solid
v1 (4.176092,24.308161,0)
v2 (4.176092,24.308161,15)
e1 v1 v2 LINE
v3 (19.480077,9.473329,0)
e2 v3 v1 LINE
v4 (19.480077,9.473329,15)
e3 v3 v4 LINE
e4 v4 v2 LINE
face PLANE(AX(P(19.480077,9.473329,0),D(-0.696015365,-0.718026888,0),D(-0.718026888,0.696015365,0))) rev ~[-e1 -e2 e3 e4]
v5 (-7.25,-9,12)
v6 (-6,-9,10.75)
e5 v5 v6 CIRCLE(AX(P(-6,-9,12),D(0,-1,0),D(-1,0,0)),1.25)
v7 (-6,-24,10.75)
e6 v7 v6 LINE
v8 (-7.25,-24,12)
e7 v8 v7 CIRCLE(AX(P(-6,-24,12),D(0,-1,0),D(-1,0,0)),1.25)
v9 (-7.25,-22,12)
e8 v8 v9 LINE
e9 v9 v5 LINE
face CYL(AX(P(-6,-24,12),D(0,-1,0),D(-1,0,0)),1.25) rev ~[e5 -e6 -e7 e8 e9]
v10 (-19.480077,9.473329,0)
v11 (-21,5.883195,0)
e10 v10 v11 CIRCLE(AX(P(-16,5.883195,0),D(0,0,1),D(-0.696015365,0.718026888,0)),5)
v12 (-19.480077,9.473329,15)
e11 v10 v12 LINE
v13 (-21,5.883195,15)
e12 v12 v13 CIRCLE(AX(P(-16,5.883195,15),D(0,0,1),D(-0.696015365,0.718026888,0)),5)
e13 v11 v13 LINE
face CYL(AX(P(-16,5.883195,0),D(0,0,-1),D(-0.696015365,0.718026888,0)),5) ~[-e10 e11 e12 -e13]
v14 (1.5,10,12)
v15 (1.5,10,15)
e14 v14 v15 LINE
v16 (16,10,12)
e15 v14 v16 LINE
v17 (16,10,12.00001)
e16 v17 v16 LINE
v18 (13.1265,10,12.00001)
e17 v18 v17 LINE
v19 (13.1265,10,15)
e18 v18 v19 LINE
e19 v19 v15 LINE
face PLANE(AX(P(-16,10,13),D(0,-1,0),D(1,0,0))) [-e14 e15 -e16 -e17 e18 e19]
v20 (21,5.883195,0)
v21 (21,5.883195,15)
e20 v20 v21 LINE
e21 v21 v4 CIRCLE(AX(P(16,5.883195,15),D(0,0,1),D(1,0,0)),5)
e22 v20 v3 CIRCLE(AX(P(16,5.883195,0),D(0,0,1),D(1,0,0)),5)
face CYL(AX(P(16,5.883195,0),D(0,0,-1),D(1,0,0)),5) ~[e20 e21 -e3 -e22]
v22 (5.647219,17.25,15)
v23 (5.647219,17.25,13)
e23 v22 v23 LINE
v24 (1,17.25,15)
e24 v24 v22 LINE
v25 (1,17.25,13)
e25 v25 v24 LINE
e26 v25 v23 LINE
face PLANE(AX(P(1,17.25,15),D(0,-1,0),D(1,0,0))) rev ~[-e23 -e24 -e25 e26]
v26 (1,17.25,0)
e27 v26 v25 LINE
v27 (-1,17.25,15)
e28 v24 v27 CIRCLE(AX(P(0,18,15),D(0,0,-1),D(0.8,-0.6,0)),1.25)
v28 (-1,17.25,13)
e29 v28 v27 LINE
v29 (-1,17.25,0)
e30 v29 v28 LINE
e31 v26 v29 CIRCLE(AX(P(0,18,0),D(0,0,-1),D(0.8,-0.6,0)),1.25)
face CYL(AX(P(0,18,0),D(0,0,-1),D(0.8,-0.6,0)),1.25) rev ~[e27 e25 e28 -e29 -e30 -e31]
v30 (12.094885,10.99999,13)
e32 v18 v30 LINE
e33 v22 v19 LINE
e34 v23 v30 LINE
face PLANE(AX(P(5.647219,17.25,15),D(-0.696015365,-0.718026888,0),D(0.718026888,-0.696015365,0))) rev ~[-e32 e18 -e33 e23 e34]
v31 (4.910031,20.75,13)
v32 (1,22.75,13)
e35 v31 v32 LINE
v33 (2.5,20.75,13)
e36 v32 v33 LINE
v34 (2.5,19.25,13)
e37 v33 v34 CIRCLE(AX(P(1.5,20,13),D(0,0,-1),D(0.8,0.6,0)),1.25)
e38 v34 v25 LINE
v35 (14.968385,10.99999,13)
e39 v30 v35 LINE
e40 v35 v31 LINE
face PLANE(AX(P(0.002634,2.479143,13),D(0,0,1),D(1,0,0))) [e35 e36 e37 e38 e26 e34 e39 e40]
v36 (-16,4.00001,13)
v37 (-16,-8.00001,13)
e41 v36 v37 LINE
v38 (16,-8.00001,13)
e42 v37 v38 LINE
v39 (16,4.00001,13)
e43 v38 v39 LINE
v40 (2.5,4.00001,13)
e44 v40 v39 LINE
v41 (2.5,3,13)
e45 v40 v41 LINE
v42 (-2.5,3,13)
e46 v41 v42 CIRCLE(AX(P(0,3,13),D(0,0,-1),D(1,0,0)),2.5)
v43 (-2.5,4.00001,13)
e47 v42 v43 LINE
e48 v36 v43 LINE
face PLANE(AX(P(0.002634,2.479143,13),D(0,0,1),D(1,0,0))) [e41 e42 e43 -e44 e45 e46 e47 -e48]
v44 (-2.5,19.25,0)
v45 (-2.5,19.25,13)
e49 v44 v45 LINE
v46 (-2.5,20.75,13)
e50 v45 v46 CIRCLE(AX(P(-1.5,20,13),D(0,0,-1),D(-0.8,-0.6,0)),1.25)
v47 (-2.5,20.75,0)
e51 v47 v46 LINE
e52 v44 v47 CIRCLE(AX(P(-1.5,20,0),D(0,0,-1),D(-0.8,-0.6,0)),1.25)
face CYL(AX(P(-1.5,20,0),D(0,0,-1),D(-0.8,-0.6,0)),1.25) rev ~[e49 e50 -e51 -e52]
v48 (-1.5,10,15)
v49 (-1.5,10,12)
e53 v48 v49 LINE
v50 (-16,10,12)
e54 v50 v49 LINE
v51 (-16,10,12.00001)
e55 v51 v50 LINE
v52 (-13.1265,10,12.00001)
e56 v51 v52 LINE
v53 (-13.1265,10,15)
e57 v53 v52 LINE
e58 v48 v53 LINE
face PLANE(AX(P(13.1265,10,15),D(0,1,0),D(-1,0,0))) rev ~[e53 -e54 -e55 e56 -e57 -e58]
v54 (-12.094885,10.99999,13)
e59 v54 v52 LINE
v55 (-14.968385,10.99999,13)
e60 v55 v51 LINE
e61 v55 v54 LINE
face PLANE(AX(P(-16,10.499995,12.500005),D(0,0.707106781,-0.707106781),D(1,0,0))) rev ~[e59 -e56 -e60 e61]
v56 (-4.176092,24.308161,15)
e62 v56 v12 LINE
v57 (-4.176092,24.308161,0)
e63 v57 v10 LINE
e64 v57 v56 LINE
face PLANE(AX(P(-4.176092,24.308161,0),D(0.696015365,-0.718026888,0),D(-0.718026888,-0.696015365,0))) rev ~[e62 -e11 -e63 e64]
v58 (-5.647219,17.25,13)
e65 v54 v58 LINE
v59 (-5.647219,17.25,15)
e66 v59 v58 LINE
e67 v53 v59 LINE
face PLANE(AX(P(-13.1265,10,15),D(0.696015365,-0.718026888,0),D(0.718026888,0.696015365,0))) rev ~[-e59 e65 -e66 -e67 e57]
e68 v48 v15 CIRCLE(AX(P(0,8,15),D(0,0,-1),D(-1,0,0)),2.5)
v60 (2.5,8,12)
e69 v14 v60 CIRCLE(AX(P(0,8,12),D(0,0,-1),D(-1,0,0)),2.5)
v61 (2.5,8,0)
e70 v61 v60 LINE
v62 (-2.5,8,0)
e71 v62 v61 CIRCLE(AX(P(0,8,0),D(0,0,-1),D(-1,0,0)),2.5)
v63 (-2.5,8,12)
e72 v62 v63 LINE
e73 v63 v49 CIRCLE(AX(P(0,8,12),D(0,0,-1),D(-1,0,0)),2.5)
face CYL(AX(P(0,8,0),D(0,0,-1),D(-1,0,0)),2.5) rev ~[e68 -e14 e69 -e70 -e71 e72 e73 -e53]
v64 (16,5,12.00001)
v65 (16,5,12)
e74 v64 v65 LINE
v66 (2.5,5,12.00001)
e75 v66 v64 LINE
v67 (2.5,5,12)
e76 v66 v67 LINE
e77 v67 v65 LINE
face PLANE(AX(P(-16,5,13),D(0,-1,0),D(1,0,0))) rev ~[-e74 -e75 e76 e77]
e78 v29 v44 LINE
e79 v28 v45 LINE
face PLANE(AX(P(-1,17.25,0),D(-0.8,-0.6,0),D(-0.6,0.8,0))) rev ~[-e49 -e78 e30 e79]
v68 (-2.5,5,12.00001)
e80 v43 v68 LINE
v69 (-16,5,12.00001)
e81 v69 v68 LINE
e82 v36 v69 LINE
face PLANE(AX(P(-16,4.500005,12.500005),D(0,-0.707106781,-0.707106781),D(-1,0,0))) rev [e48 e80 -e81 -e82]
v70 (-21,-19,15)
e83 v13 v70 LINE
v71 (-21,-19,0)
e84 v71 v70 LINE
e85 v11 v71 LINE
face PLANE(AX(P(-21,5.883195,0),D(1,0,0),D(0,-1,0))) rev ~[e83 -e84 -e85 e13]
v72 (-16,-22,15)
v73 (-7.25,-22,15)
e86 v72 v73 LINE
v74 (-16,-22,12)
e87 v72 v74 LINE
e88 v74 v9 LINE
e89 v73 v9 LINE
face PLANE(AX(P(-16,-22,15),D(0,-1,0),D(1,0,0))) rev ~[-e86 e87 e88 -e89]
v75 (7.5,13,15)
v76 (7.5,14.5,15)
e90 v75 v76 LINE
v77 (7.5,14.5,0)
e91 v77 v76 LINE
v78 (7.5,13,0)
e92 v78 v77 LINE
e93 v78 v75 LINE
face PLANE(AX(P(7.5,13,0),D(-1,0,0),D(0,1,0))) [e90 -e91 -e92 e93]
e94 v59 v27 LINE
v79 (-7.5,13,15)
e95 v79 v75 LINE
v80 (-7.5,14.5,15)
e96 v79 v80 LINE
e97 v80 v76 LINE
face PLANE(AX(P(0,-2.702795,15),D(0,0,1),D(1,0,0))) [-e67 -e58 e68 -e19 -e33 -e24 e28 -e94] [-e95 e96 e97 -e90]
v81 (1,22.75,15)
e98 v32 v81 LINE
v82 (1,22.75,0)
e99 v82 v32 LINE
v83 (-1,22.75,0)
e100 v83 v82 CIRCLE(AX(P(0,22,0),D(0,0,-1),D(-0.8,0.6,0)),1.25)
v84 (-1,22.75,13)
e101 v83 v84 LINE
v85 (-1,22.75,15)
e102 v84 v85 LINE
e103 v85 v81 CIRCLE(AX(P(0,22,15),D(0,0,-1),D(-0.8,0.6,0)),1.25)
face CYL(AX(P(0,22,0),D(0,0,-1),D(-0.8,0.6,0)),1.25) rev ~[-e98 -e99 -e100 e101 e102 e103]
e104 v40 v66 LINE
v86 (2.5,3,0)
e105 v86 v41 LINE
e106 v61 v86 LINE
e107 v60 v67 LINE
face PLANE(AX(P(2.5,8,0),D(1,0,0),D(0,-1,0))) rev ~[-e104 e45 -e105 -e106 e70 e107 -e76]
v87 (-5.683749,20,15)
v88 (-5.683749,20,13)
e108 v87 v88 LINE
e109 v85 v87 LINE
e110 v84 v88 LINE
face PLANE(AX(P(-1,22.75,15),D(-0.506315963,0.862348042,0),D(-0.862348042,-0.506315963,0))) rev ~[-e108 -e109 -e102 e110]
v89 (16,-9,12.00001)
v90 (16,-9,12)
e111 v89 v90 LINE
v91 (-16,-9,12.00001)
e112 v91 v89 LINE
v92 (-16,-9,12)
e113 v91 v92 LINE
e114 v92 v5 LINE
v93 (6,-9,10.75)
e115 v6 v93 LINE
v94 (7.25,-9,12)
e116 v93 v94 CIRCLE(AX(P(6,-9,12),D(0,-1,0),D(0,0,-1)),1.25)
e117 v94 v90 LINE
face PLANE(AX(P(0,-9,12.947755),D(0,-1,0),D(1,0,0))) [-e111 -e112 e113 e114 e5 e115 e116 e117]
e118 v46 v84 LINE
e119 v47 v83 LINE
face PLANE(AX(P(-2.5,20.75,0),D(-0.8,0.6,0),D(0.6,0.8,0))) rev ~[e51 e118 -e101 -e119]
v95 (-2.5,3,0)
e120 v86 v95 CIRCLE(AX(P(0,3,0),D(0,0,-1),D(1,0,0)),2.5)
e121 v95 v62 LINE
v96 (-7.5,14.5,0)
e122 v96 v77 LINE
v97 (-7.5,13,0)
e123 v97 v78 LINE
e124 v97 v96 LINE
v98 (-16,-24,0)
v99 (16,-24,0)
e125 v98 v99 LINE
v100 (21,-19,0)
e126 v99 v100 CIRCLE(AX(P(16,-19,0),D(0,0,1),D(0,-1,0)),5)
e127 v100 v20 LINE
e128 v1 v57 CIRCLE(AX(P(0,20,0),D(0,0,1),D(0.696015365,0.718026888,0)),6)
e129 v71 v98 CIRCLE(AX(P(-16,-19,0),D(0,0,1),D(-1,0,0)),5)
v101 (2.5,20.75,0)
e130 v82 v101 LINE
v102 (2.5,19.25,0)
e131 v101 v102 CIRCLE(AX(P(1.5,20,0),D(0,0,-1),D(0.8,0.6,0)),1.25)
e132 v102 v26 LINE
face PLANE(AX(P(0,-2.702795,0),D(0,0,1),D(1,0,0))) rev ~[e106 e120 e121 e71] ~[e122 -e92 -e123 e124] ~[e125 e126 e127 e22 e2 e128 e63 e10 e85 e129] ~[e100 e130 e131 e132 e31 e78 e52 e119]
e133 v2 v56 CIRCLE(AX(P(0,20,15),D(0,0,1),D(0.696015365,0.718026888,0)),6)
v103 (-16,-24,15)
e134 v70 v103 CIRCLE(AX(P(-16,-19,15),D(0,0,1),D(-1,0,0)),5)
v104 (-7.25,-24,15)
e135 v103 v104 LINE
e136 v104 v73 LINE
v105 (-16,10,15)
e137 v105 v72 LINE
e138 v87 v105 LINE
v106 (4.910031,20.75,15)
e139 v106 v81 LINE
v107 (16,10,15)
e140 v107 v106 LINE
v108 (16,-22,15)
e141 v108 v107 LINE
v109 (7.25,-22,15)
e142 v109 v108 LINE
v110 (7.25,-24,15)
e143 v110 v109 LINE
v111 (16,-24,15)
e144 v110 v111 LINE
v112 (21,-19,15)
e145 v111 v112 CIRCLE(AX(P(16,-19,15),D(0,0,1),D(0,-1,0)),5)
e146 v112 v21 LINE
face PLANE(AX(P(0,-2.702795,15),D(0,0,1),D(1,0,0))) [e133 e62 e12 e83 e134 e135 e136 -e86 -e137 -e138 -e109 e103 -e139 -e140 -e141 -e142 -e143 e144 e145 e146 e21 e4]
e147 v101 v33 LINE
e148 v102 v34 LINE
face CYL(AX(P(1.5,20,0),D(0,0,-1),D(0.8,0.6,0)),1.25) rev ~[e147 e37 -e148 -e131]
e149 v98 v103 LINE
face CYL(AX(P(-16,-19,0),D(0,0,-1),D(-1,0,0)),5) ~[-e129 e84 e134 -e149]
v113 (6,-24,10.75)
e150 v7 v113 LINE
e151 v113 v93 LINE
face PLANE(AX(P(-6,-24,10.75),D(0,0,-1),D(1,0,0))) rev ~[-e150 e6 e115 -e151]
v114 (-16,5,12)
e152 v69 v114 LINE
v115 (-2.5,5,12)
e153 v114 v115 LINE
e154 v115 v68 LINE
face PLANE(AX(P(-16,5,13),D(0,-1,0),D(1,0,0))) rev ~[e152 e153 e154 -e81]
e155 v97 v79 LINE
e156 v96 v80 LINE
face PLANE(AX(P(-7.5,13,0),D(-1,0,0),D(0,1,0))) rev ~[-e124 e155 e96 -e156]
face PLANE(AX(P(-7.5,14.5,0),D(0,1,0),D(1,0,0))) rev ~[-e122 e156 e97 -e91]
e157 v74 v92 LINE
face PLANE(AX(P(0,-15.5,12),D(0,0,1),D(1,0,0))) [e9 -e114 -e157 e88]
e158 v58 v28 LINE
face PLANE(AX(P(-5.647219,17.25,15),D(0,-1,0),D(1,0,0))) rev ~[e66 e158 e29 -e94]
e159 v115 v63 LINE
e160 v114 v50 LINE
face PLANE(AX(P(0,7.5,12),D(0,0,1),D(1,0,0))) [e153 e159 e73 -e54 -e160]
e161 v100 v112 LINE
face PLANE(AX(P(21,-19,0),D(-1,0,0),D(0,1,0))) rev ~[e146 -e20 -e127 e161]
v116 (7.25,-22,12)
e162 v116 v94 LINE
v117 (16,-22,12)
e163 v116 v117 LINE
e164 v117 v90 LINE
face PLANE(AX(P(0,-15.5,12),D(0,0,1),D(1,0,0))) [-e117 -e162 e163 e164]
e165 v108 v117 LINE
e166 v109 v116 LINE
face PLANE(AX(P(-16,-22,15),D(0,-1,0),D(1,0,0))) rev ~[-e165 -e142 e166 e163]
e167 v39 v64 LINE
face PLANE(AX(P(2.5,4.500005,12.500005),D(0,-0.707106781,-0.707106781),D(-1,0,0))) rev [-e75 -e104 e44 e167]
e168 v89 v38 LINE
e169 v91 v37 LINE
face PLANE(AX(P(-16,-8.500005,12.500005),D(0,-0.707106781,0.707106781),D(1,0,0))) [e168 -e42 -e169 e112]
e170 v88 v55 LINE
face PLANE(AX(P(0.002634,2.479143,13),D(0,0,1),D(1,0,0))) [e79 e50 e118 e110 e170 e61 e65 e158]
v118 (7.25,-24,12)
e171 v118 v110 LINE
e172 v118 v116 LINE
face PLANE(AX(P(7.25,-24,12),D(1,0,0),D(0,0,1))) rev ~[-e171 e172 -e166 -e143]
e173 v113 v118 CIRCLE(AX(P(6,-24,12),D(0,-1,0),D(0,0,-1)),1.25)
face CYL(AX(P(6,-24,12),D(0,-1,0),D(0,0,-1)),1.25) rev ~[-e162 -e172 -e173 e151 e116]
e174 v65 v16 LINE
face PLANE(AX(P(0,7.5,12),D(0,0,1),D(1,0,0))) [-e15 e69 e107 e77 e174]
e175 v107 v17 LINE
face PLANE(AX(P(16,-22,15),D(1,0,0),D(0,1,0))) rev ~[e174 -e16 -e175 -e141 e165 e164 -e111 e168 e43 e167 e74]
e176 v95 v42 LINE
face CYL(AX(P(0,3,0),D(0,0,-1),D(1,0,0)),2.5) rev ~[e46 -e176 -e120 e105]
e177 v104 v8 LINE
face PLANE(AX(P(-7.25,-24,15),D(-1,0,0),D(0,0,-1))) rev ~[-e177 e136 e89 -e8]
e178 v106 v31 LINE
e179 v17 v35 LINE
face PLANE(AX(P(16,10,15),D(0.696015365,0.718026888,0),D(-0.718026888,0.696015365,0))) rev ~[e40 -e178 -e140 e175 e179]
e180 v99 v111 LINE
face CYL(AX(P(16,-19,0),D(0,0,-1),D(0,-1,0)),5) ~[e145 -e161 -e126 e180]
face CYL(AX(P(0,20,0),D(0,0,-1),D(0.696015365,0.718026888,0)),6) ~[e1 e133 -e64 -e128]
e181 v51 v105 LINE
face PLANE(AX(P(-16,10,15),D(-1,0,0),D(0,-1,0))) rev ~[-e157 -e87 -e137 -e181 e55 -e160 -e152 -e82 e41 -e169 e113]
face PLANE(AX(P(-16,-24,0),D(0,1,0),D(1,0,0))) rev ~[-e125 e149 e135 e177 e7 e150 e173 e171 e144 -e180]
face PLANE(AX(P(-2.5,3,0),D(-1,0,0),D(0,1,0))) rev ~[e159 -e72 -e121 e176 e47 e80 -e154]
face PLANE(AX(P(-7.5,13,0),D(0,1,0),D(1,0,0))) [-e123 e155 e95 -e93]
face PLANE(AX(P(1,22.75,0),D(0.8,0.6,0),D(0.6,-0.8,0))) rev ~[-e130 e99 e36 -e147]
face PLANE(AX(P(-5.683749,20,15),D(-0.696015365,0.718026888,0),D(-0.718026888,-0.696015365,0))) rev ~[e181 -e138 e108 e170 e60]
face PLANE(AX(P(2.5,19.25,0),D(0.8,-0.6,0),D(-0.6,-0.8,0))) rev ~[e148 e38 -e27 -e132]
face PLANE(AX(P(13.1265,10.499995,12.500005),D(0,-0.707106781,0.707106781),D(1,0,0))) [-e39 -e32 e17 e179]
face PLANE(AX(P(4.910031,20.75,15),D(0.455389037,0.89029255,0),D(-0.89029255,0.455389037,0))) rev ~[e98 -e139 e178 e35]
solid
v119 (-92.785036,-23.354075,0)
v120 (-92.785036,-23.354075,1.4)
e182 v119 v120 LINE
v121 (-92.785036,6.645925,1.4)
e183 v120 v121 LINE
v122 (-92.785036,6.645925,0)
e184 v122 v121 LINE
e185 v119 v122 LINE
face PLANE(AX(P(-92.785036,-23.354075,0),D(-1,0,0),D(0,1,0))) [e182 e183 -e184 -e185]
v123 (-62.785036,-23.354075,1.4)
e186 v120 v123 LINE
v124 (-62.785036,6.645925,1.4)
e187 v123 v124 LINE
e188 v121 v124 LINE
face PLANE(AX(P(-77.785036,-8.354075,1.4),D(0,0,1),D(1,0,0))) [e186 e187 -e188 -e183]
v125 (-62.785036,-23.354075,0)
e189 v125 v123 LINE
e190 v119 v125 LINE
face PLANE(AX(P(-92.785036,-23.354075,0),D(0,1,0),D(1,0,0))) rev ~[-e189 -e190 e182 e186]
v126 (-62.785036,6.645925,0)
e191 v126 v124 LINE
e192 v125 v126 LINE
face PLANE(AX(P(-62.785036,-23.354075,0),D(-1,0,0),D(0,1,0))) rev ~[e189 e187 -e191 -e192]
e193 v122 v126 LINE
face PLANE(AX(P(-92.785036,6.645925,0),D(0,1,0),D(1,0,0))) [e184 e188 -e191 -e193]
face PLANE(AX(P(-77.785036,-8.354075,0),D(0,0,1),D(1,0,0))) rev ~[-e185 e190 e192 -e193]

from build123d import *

# Parameters (mm, degrees)
F0_W     = 30
F0_H     = 30
F1_DEPTH = 1.4
F2_W     = 15
F2_H     = 1.5
F3_DEPTH = 15
F5_DEPTH = 2
F7_DEPTH = 15
F8_W     = 32
F8_H     = 5
F8_H_2   = 13
F9_DEPTH = 1
F10_SIZE = 0.99999


# Not quite as in the source:
# - a fillet or chamfer is up to 0.001 mm smaller than in the source, because OpenCascade refuses the exact size


with BuildPart() as f1:
    # F0 (on Top) → F1 (new body)
    with BuildSketch(Plane.XY):
        with Locations((-77.7850355953, -8.3540751795)):
            Rectangle(F0_W, F0_H)
    extrude(amount=F1_DEPTH)


with BuildPart() as f3:
    # F2 (on Top) → F3 (new body)
    with BuildSketch(Plane.XY):
        with BuildLine():
            Line((19.4800768234, 9.4733290654), (4.176092188, 24.308161329))
            ThreePointArc((4.176092188, 24.308161329), (0, 26), (-4.176092188, 24.308161329))
            Line((-4.176092188, 24.308161329), (-19.4800768234, 9.4733290654))
            ThreePointArc((-19.4800768234, 9.4733290654), (-20.6043666294, 7.8325042309), (-21, 5.8831946245))
            Line((-21, 5.8831946245), (-21, -19))
            ThreePointArc((-21, -19), (-19.5355339059, -22.5355339059), (-16, -24))
            Line((-16, -24), (16, -24))
            ThreePointArc((16, -24), (19.5355339059, -22.5355339059), (21, -19))
            Line((21, -19), (21, 5.8831946245))
            ThreePointArc((21, 5.8831946245), (20.6043666294, 7.8325042309), (19.4800768234, 9.4733290654))
        make_face()
        with BuildLine():
            ThreePointArc((-2.5, 8), (0, 10.5), (2.5, 8))
            Line((2.5, 8), (2.5, 3))
            ThreePointArc((2.5, 3), (0, 0.5), (-2.5, 3))
            Line((-2.5, 3), (-2.5, 8))
        make_face(mode=Mode.SUBTRACT)
        with Locations((0, 13.75)):
            Rectangle(F2_W, F2_H, mode=Mode.SUBTRACT)
        with BuildLine():
            ThreePointArc((-1, 22.75), (0, 23.25), (1, 22.75))
            Line((1, 22.75), (2.5, 20.75))
            ThreePointArc((2.5, 20.75), (2.75, 20), (2.5, 19.25))
            Line((2.5, 19.25), (1, 17.25))
            ThreePointArc((1, 17.25), (0, 16.75), (-1, 17.25))
            Line((-1, 17.25), (-2.5, 19.25))
            ThreePointArc((-2.5, 19.25), (-2.75, 20), (-2.5, 20.75))
            Line((-2.5, 20.75), (-1, 22.75))
        make_face(mode=Mode.SUBTRACT)
    extrude(amount=F3_DEPTH)

    # F4 (on face) → F5 (cut)
    with BuildSketch(Plane.XY.offset(15)):
        Polygon((13.1265002161, 10), (-13.1265002161, 10), (-5.6472185744, 17.25), (-1, 17.25), (-1, 22.75), (-5.6837494598, 20), (-16, 10), (-16, -22), (16, -22), (16, 10), (4.9100306693, 20.75), (1, 22.75), (1, 17.25), (5.6472185744, 17.25), align=None)
    extrude(amount=-F5_DEPTH, mode=Mode.SUBTRACT)

    # F6 (on face) → F7 (cut)
    with BuildSketch(Plane.XZ.offset(24)):
        with BuildLine():
            Line((-7.25, 15), (-7.25, 12))
            ThreePointArc((-7.25, 12), (-6.8838834765, 11.1161165235), (-6, 10.75))
            Line((-6, 10.75), (6, 10.75))
            ThreePointArc((6, 10.75), (6.8838834765, 11.1161165235), (7.25, 12))
            Line((7.25, 12), (7.25, 15))
            Line((7.25, 15), (-7.25, 15))
        make_face()
    extrude(amount=-F7_DEPTH, mode=Mode.SUBTRACT)

    # F8 (on face) → F9 (cut)
    with BuildSketch(Plane.XY.offset(13)):
        with Locations((0, 7.5)):
            Rectangle(F8_W, F8_H)
        with Locations((0, -15.5)):
            Rectangle(F8_W, F8_H_2)
    extrude(amount=-F9_DEPTH, mode=Mode.SUBTRACT)

    # F10 (size 1 in the source; OpenCascade refuses exactly that, so slightly less here)
    f10_edges = [f3.edges().sort_by_distance(p)[0] for p in [
        (-14.56325, 10, 13),
        (14.56325, 10, 13),
        (9.25, 5, 13),
        (-9.25, 5, 13),
        (0, -9, 13),
    ]]
    chamfer(f10_edges, length=F10_SIZE)


solid = Compound([f1.part, f3.part])
